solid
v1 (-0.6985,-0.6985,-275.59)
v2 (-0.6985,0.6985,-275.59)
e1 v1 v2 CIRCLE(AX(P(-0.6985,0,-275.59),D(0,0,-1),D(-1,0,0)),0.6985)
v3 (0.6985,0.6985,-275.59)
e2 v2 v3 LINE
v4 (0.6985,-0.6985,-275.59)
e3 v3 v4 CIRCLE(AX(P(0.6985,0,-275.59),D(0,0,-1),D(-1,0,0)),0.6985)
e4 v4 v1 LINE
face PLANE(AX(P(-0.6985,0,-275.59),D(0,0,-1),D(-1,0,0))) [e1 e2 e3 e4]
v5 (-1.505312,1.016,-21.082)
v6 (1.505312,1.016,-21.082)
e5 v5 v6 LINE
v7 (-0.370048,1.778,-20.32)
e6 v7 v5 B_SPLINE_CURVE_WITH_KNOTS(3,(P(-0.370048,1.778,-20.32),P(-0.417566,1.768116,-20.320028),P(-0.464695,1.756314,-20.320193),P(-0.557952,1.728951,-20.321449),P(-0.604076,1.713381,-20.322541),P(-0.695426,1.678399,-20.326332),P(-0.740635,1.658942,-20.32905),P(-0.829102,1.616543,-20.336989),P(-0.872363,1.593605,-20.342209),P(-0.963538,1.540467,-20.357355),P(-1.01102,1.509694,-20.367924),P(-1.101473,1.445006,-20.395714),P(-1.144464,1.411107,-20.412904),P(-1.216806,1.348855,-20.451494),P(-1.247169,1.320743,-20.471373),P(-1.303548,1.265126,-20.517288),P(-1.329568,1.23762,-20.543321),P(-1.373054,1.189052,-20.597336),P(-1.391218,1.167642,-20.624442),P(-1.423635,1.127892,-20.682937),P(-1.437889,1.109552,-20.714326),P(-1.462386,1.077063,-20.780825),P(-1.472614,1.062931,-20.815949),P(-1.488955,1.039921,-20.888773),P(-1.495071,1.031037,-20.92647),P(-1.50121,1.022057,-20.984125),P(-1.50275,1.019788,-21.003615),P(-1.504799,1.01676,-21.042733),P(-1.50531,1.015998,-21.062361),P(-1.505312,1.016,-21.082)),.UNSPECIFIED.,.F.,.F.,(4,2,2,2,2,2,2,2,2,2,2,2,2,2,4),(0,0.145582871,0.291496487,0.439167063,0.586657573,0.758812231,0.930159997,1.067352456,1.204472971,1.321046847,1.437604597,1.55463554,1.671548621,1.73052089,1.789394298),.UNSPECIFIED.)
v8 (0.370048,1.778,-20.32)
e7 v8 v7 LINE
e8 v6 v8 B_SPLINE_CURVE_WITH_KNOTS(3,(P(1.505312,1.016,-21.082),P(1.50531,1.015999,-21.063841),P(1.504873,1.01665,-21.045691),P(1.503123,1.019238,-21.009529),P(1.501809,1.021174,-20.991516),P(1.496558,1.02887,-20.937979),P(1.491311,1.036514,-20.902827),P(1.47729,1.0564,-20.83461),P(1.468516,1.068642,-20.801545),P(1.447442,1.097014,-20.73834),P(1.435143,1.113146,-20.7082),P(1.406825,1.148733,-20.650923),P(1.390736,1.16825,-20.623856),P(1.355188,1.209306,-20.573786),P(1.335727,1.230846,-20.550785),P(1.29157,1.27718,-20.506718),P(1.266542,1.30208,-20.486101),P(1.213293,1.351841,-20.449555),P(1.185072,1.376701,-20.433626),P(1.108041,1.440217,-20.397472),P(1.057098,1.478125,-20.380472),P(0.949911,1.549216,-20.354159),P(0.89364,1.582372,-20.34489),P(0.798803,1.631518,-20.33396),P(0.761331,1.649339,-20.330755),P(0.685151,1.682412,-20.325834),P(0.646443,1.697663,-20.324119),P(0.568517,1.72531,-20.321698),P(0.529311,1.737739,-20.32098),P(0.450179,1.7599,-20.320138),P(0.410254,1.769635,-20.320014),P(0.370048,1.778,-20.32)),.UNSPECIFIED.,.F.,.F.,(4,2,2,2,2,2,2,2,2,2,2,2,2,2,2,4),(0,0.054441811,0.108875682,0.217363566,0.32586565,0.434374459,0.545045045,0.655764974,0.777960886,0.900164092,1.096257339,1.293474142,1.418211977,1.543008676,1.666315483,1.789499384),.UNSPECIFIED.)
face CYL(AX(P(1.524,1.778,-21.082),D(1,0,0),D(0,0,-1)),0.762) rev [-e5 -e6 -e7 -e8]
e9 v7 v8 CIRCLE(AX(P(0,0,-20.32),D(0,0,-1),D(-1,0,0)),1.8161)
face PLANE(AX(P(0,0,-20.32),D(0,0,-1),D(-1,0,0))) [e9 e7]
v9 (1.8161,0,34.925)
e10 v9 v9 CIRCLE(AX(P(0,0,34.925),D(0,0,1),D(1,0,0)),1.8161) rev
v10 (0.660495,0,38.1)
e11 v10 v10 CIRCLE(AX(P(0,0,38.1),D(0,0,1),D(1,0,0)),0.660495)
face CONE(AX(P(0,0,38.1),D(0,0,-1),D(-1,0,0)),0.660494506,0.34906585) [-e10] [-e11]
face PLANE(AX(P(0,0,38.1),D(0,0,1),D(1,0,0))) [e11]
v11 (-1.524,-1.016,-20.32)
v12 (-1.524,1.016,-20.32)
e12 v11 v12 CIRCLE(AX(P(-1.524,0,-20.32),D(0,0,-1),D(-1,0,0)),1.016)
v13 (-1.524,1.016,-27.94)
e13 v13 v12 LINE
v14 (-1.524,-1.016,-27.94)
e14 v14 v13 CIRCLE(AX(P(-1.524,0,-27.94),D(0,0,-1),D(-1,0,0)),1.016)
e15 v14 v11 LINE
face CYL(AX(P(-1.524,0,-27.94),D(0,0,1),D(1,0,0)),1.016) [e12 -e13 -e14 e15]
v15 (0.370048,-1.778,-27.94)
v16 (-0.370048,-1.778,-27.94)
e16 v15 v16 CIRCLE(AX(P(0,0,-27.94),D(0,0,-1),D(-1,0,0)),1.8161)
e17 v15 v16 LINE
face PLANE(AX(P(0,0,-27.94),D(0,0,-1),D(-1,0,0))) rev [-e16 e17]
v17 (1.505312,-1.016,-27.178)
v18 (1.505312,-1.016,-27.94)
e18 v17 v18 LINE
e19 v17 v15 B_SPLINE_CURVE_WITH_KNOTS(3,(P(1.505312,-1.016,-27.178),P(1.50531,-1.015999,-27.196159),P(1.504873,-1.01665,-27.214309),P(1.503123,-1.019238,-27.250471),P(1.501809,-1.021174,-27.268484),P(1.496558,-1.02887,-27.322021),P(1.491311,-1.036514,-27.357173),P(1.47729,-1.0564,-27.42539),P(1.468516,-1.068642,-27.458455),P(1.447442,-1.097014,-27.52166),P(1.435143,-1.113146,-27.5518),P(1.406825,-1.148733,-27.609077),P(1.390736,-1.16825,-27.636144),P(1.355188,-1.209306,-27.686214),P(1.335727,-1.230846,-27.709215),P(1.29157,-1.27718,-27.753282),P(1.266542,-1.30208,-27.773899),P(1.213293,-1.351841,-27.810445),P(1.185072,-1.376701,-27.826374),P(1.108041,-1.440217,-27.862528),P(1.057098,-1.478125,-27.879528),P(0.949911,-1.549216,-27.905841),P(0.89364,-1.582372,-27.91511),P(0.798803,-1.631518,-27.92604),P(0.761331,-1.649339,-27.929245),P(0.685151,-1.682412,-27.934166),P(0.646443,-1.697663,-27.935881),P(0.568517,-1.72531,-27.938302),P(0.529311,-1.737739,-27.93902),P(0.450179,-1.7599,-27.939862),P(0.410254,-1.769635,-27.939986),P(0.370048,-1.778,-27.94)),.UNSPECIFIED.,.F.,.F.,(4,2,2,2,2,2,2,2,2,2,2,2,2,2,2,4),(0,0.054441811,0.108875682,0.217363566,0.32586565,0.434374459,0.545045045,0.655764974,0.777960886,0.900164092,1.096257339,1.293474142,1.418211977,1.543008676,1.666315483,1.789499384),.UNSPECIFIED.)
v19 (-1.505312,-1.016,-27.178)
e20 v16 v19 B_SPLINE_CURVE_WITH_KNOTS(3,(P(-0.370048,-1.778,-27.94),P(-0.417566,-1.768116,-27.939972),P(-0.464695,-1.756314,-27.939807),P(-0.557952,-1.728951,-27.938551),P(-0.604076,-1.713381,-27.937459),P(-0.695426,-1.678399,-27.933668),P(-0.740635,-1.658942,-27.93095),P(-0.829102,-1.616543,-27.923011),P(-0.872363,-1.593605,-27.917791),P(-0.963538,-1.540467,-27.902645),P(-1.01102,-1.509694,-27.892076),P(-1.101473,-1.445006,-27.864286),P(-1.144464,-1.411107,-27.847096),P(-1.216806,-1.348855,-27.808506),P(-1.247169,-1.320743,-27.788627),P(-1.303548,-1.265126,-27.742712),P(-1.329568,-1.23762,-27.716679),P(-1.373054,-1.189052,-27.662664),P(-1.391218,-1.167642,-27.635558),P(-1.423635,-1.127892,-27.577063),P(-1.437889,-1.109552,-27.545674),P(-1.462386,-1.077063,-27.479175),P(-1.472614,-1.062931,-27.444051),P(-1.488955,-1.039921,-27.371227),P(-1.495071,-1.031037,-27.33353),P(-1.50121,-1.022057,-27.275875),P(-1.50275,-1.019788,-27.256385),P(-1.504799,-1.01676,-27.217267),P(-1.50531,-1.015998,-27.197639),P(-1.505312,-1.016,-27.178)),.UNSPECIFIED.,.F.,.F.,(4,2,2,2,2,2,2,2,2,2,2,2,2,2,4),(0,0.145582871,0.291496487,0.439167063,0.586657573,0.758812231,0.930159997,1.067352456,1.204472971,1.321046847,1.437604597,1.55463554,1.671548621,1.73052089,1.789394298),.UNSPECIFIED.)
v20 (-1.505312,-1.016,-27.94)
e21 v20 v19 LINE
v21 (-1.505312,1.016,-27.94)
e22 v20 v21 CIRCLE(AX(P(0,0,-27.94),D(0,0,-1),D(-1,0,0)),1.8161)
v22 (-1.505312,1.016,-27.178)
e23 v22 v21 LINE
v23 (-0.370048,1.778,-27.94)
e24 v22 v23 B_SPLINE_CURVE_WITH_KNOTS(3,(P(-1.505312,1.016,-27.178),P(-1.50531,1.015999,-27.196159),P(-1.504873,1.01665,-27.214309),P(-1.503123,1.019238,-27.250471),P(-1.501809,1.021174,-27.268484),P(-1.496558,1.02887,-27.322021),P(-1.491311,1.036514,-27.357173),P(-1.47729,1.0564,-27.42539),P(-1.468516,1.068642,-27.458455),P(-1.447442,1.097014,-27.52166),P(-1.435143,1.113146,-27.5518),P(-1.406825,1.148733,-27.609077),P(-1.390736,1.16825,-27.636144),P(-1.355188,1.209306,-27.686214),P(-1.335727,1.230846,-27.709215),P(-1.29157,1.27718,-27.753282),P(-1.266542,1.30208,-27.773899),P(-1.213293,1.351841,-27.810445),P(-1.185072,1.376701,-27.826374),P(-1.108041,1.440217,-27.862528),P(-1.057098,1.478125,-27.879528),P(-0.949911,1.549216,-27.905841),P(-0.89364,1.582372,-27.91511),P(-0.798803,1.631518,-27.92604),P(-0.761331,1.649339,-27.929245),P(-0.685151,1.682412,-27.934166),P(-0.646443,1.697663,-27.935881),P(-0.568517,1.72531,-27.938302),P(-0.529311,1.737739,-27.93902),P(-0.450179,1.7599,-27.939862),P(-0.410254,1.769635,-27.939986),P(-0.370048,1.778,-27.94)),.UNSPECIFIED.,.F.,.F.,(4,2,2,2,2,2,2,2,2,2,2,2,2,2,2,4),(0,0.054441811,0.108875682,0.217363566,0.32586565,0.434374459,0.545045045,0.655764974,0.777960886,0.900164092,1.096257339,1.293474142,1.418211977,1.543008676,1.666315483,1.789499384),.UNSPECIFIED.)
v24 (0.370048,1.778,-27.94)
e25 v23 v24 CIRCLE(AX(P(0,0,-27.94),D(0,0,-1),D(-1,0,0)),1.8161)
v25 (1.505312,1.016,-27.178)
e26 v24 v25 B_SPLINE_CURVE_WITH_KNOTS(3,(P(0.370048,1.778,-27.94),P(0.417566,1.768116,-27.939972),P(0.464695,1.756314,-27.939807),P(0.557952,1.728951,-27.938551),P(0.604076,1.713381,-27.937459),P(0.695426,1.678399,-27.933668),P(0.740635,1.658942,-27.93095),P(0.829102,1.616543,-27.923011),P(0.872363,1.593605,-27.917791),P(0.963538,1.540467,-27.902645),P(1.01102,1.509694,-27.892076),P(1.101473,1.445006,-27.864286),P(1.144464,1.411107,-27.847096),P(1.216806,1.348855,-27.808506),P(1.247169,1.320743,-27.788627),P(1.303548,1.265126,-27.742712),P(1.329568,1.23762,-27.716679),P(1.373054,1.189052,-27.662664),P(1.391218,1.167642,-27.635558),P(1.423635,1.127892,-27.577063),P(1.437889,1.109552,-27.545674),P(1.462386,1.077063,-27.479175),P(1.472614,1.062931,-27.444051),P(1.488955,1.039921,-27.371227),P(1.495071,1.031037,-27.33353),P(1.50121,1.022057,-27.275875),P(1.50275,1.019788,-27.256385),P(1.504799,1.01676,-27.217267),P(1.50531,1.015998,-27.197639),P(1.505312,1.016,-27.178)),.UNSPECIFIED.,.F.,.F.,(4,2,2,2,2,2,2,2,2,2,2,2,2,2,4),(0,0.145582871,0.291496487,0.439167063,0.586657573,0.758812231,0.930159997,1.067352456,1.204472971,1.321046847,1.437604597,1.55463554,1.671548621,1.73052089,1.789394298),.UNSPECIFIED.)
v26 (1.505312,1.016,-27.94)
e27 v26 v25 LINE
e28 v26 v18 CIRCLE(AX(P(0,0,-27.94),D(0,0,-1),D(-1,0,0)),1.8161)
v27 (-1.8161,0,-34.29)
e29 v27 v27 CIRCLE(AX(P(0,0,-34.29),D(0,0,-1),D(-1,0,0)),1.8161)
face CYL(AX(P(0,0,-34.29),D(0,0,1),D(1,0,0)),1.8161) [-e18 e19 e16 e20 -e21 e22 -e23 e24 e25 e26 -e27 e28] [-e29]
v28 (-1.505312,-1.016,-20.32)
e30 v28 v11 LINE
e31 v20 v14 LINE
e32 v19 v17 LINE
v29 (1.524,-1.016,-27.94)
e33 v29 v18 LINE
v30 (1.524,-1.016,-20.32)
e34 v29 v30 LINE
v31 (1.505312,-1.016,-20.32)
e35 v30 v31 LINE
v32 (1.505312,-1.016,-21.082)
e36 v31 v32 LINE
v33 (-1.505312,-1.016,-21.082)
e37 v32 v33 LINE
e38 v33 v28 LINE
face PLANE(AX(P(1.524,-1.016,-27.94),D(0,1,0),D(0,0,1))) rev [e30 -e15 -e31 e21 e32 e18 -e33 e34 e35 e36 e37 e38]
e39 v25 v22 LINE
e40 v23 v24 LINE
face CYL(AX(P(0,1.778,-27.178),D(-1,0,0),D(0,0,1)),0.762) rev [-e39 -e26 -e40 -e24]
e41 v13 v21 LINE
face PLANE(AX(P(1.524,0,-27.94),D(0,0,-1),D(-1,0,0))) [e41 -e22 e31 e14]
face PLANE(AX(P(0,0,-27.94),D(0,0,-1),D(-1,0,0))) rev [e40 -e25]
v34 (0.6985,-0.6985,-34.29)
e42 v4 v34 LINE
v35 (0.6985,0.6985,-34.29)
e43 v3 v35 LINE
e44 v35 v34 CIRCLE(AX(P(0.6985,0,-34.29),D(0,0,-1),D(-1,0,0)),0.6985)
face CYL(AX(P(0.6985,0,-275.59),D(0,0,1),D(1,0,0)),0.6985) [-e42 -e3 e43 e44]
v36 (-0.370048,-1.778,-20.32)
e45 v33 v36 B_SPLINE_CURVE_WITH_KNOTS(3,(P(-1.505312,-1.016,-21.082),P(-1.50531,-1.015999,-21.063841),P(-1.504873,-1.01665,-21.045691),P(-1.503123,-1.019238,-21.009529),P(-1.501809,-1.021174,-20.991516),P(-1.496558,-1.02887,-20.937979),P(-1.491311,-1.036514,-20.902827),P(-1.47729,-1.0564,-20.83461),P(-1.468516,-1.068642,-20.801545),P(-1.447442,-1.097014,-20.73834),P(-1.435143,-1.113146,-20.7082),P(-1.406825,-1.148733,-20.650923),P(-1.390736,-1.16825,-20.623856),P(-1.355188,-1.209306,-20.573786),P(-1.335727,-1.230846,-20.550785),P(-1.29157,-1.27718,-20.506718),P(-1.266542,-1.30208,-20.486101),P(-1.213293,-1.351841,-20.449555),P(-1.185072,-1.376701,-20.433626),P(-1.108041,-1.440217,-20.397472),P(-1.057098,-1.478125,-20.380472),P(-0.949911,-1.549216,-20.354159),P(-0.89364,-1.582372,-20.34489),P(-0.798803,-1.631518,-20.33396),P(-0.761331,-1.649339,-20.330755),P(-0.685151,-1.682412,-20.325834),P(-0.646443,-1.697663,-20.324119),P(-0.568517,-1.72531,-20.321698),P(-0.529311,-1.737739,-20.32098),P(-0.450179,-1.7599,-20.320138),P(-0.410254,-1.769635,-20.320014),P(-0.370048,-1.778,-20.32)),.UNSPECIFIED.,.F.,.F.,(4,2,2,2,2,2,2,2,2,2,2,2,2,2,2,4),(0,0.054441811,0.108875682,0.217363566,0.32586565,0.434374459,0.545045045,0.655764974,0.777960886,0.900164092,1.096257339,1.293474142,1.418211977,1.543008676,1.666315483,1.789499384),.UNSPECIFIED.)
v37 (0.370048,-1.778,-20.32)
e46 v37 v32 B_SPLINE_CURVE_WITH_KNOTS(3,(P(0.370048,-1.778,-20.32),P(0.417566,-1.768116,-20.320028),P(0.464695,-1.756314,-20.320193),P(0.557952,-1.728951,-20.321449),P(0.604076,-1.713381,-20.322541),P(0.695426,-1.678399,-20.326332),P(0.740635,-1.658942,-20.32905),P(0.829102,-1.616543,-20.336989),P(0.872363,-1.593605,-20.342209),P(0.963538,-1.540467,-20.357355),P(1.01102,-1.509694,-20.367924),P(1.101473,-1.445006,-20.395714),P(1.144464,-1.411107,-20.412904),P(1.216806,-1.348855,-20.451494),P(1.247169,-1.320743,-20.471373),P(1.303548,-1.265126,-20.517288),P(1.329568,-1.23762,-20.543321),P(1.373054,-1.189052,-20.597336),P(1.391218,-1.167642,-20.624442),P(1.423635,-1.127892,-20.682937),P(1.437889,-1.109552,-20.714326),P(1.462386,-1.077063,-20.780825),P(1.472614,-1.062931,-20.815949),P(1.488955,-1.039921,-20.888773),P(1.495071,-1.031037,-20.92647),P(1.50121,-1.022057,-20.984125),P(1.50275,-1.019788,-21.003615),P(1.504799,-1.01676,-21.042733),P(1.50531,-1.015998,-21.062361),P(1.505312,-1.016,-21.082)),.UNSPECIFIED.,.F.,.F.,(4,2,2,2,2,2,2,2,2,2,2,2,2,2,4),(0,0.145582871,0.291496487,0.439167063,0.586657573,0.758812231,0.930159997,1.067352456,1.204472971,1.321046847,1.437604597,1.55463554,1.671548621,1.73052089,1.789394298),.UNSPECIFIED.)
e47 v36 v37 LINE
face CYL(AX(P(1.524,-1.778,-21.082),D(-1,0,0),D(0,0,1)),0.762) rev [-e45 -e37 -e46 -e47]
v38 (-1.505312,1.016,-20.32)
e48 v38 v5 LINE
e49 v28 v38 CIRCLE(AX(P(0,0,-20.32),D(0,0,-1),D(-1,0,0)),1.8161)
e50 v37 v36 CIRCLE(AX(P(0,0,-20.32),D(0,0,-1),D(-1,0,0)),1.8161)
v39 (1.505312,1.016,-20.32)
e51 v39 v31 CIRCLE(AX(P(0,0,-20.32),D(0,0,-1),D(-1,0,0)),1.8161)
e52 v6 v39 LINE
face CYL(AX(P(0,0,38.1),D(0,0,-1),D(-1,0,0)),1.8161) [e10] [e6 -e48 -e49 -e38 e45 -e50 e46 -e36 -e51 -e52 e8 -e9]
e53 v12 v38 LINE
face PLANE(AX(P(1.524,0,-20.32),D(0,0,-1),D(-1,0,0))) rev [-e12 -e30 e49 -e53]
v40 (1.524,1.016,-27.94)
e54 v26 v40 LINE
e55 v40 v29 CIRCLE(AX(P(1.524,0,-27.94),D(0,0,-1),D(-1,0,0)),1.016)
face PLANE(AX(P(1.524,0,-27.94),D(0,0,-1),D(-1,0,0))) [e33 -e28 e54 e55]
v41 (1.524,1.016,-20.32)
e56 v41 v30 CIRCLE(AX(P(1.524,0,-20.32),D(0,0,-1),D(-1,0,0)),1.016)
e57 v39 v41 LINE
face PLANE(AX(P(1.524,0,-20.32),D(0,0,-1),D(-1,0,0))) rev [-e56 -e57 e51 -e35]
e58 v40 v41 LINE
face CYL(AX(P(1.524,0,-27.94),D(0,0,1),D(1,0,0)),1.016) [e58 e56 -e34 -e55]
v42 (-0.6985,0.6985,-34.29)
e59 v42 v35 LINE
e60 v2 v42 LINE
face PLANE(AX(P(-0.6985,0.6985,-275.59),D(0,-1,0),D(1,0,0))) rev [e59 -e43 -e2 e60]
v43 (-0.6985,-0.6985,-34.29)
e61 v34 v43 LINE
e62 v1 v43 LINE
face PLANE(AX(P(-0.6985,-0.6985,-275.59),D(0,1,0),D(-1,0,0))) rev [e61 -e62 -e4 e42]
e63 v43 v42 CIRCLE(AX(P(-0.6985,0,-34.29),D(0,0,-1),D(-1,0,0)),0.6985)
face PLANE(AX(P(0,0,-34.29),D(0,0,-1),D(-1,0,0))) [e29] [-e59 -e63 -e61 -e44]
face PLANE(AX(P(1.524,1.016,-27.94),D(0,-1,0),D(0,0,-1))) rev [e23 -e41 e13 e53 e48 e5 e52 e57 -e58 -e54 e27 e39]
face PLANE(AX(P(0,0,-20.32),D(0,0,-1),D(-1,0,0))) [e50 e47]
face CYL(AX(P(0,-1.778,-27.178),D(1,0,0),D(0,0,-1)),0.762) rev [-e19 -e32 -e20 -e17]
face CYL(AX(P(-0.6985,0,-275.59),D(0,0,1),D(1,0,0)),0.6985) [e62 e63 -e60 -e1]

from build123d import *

# Parameters (mm, degrees)
SKETCH1_R           = 1.8161
BOSS_EXTRUDE1_DEPTH = 38.1
CHAMFER1_SIZE       = 3.175
CHAMFER1_SIZE2      = 1.155605494
BOSS_EXTRUDE2_START = 2.54
SKETCH2_R           = 1.8161
BOSS_EXTRUDE2_DEPTH = 2.54
BOSS_EXTRUDE3_START = 17.78
SKETCH3_R           = 1.8161
BOSS_EXTRUDE3_DEPTH = 17.78
BOSS_EXTRUDE4_DEPTH = 7.62
BOSS_EXTRUDE5_START = 6.35
BOSS_EXTRUDE5_DEPTH = 6.35
BOSS_EXTRUDE6_DEPTH = 241.3
FILLET2_R           = 0.762


with BuildPart() as part:
    # Sketch1 → Boss-Extrude1 (new body)
    with BuildSketch(Plane.XY):
        with Locations(Location((0, 0, 0), (0, 0, 180))):
            Circle(SKETCH1_R)
    extrude(amount=BOSS_EXTRUDE1_DEPTH)

    # Chamfer1
    chamfer1_edges = [part.edges().sort_by_distance(p)[0] for p in [
        (1.8161, 0, 38.1),
    ]]
    chamfer1_side = [part.faces().sort_by_distance(p)[0] for p in [
        (1.8161, 0, 19.05),
    ]]
    chamfer(chamfer1_edges, length=CHAMFER1_SIZE, length2=CHAMFER1_SIZE2, reference=chamfer1_side[0])

    # Sketch2 → Boss-Extrude2 (add)
    with BuildSketch(Plane(origin=(0, 0, 0), x_dir=(-1, 0, 0), z_dir=(0, 0, -1)).offset(BOSS_EXTRUDE2_START)):
        Circle(SKETCH2_R)
    extrude(amount=-BOSS_EXTRUDE2_DEPTH)

    # Sketch3 → Boss-Extrude3 (add)
    with BuildSketch(Plane(origin=(0, 0, -2.54), x_dir=(-1, 0, 0), z_dir=(0, 0, -1)).offset(BOSS_EXTRUDE3_START)):
        Circle(SKETCH3_R)
    extrude(amount=-BOSS_EXTRUDE3_DEPTH)

    # Sketch4 → Boss-Extrude4 (add)
    with BuildSketch(Plane(origin=(0, 0, -20.32), x_dir=(-1, 0, 0), z_dir=(0, 0, -1))):
        with BuildLine():
            Line((-1.524, 1.016), (1.524, 1.016))
            ThreePointArc((1.524, 1.016), (2.54, 0), (1.524, -1.016))
            Line((1.524, -1.016), (-1.524, -1.016))
            ThreePointArc((-1.524, -1.016), (-2.54, 0), (-1.524, 1.016))
        make_face()
    extrude(amount=BOSS_EXTRUDE4_DEPTH)

    # Sketch5 → Boss-Extrude5 (add)
    with BuildSketch(Plane(origin=(0, 0, -27.94), x_dir=(-1, 0, 0), z_dir=(0, 0, -1)).offset(BOSS_EXTRUDE5_START)):
        with BuildLine():
            ThreePointArc((-1.50542625, -1.01583021), (0, -1.8161), (1.50542625, -1.01583021))
            ThreePointArc((1.50542625, -1.01583021), (0, 1.8161), (-1.50542625, -1.01583021))
        make_face()
    extrude(amount=-BOSS_EXTRUDE5_DEPTH)

    # Sketch6 → Boss-Extrude6 (add)
    with BuildSketch(Plane(origin=(0, 0, -34.29), x_dir=(-1, 0, 0), z_dir=(0, 0, -1))):
        with BuildLine():
            Line((0.6985, -0.6985), (-0.6985, -0.6985))
            ThreePointArc((-0.6985, -0.6985), (-1.397, 0), (-0.6985, 0.6985))
            Line((-0.6985, 0.6985), (0.6985, 0.6985))
            ThreePointArc((0.6985, 0.6985), (1.397, 0), (0.6985, -0.6985))
        make_face()
    extrude(amount=BOSS_EXTRUDE6_DEPTH)

    # Fillet2
    # the kernel refuses this fillet: 0.762 mm, written as the material it adds along each edge
    with BuildSketch(Plane(origin=(-3.410311665, -1.016, -20.32), x_dir=(0, -1, 0), z_dir=(1, 0, 0))) as fillet2_piece_1_section:
        with BuildLine():
            CenterArc((FILLET2_R, FILLET2_R), FILLET2_R, 180, 90)
            Line((0, FILLET2_R), (0, 0))
            Line((0, 0), (FILLET2_R, 0))
        make_face()
    fillet2_piece_1 = extrude(amount=6.820623331, mode=Mode.PRIVATE)
    fillet2_piece_1 = fillet2_piece_1 & Plane(origin=(0, 0, -20.517592364), x_dir=(-1, 0, 0), z_dir=(0, 0, -1)) * Cylinder(1.8161, 17, mode=Mode.PRIVATE)
    add(fillet2_piece_1)
    with BuildSketch(Plane(origin=(3.410311665, 1.016, -20.32), x_dir=(0, 1, 0), z_dir=(-1, 0, 0))) as fillet2_piece_2_section:
        with BuildLine():
            CenterArc((FILLET2_R, FILLET2_R), FILLET2_R, 180, 90)
            Line((0, FILLET2_R), (0, 0))
            Line((0, 0), (FILLET2_R, 0))
        make_face()
    fillet2_piece_2 = extrude(amount=6.820623331, mode=Mode.PRIVATE)
    fillet2_piece_2 = fillet2_piece_2 & Plane(origin=(0, 0, -20.517592364), x_dir=(-1, 0, 0), z_dir=(0, 0, -1)) * Cylinder(1.8161, 17, mode=Mode.PRIVATE)
    add(fillet2_piece_2)
    with BuildSketch(Plane(origin=(-3.410311665, -1.016, -27.94), x_dir=(0, 0, 1), z_dir=(1, 0, 0))) as fillet2_piece_3_section:
        with BuildLine():
            CenterArc((FILLET2_R, FILLET2_R), FILLET2_R, 180, 90)
            Line((0, FILLET2_R), (0, 0))
            Line((0, 0), (FILLET2_R, 0))
        make_face()
    fillet2_piece_3 = extrude(amount=6.820623331, mode=Mode.PRIVATE)
    fillet2_piece_3 = fillet2_piece_3 & Plane(origin=(0, 0, -27.742407671), x_dir=(0.8289335664335663, -0.5593470679638254, 0), z_dir=(0, 0, -1)) * Cylinder(1.8161, 17, mode=Mode.PRIVATE)
    add(fillet2_piece_3)
    with BuildSketch(Plane(origin=(3.410311665, 1.016, -27.94), x_dir=(0, 0, 1), z_dir=(-1, 0, 0))) as fillet2_piece_4_section:
        with BuildLine():
            CenterArc((FILLET2_R, FILLET2_R), FILLET2_R, 180, 90)
            Line((0, FILLET2_R), (0, 0))
            Line((0, 0), (FILLET2_R, 0))
        make_face()
    fillet2_piece_4 = extrude(amount=6.820623331, mode=Mode.PRIVATE)
    fillet2_piece_4 = fillet2_piece_4 & Plane(origin=(0, 0, -27.742407638), x_dir=(0.8289335664335663, -0.5593470679638254, 0), z_dir=(0, 0, -1)) * Cylinder(1.8161, 17, mode=Mode.PRIVATE)
    add(fillet2_piece_4)


solid = part.part
